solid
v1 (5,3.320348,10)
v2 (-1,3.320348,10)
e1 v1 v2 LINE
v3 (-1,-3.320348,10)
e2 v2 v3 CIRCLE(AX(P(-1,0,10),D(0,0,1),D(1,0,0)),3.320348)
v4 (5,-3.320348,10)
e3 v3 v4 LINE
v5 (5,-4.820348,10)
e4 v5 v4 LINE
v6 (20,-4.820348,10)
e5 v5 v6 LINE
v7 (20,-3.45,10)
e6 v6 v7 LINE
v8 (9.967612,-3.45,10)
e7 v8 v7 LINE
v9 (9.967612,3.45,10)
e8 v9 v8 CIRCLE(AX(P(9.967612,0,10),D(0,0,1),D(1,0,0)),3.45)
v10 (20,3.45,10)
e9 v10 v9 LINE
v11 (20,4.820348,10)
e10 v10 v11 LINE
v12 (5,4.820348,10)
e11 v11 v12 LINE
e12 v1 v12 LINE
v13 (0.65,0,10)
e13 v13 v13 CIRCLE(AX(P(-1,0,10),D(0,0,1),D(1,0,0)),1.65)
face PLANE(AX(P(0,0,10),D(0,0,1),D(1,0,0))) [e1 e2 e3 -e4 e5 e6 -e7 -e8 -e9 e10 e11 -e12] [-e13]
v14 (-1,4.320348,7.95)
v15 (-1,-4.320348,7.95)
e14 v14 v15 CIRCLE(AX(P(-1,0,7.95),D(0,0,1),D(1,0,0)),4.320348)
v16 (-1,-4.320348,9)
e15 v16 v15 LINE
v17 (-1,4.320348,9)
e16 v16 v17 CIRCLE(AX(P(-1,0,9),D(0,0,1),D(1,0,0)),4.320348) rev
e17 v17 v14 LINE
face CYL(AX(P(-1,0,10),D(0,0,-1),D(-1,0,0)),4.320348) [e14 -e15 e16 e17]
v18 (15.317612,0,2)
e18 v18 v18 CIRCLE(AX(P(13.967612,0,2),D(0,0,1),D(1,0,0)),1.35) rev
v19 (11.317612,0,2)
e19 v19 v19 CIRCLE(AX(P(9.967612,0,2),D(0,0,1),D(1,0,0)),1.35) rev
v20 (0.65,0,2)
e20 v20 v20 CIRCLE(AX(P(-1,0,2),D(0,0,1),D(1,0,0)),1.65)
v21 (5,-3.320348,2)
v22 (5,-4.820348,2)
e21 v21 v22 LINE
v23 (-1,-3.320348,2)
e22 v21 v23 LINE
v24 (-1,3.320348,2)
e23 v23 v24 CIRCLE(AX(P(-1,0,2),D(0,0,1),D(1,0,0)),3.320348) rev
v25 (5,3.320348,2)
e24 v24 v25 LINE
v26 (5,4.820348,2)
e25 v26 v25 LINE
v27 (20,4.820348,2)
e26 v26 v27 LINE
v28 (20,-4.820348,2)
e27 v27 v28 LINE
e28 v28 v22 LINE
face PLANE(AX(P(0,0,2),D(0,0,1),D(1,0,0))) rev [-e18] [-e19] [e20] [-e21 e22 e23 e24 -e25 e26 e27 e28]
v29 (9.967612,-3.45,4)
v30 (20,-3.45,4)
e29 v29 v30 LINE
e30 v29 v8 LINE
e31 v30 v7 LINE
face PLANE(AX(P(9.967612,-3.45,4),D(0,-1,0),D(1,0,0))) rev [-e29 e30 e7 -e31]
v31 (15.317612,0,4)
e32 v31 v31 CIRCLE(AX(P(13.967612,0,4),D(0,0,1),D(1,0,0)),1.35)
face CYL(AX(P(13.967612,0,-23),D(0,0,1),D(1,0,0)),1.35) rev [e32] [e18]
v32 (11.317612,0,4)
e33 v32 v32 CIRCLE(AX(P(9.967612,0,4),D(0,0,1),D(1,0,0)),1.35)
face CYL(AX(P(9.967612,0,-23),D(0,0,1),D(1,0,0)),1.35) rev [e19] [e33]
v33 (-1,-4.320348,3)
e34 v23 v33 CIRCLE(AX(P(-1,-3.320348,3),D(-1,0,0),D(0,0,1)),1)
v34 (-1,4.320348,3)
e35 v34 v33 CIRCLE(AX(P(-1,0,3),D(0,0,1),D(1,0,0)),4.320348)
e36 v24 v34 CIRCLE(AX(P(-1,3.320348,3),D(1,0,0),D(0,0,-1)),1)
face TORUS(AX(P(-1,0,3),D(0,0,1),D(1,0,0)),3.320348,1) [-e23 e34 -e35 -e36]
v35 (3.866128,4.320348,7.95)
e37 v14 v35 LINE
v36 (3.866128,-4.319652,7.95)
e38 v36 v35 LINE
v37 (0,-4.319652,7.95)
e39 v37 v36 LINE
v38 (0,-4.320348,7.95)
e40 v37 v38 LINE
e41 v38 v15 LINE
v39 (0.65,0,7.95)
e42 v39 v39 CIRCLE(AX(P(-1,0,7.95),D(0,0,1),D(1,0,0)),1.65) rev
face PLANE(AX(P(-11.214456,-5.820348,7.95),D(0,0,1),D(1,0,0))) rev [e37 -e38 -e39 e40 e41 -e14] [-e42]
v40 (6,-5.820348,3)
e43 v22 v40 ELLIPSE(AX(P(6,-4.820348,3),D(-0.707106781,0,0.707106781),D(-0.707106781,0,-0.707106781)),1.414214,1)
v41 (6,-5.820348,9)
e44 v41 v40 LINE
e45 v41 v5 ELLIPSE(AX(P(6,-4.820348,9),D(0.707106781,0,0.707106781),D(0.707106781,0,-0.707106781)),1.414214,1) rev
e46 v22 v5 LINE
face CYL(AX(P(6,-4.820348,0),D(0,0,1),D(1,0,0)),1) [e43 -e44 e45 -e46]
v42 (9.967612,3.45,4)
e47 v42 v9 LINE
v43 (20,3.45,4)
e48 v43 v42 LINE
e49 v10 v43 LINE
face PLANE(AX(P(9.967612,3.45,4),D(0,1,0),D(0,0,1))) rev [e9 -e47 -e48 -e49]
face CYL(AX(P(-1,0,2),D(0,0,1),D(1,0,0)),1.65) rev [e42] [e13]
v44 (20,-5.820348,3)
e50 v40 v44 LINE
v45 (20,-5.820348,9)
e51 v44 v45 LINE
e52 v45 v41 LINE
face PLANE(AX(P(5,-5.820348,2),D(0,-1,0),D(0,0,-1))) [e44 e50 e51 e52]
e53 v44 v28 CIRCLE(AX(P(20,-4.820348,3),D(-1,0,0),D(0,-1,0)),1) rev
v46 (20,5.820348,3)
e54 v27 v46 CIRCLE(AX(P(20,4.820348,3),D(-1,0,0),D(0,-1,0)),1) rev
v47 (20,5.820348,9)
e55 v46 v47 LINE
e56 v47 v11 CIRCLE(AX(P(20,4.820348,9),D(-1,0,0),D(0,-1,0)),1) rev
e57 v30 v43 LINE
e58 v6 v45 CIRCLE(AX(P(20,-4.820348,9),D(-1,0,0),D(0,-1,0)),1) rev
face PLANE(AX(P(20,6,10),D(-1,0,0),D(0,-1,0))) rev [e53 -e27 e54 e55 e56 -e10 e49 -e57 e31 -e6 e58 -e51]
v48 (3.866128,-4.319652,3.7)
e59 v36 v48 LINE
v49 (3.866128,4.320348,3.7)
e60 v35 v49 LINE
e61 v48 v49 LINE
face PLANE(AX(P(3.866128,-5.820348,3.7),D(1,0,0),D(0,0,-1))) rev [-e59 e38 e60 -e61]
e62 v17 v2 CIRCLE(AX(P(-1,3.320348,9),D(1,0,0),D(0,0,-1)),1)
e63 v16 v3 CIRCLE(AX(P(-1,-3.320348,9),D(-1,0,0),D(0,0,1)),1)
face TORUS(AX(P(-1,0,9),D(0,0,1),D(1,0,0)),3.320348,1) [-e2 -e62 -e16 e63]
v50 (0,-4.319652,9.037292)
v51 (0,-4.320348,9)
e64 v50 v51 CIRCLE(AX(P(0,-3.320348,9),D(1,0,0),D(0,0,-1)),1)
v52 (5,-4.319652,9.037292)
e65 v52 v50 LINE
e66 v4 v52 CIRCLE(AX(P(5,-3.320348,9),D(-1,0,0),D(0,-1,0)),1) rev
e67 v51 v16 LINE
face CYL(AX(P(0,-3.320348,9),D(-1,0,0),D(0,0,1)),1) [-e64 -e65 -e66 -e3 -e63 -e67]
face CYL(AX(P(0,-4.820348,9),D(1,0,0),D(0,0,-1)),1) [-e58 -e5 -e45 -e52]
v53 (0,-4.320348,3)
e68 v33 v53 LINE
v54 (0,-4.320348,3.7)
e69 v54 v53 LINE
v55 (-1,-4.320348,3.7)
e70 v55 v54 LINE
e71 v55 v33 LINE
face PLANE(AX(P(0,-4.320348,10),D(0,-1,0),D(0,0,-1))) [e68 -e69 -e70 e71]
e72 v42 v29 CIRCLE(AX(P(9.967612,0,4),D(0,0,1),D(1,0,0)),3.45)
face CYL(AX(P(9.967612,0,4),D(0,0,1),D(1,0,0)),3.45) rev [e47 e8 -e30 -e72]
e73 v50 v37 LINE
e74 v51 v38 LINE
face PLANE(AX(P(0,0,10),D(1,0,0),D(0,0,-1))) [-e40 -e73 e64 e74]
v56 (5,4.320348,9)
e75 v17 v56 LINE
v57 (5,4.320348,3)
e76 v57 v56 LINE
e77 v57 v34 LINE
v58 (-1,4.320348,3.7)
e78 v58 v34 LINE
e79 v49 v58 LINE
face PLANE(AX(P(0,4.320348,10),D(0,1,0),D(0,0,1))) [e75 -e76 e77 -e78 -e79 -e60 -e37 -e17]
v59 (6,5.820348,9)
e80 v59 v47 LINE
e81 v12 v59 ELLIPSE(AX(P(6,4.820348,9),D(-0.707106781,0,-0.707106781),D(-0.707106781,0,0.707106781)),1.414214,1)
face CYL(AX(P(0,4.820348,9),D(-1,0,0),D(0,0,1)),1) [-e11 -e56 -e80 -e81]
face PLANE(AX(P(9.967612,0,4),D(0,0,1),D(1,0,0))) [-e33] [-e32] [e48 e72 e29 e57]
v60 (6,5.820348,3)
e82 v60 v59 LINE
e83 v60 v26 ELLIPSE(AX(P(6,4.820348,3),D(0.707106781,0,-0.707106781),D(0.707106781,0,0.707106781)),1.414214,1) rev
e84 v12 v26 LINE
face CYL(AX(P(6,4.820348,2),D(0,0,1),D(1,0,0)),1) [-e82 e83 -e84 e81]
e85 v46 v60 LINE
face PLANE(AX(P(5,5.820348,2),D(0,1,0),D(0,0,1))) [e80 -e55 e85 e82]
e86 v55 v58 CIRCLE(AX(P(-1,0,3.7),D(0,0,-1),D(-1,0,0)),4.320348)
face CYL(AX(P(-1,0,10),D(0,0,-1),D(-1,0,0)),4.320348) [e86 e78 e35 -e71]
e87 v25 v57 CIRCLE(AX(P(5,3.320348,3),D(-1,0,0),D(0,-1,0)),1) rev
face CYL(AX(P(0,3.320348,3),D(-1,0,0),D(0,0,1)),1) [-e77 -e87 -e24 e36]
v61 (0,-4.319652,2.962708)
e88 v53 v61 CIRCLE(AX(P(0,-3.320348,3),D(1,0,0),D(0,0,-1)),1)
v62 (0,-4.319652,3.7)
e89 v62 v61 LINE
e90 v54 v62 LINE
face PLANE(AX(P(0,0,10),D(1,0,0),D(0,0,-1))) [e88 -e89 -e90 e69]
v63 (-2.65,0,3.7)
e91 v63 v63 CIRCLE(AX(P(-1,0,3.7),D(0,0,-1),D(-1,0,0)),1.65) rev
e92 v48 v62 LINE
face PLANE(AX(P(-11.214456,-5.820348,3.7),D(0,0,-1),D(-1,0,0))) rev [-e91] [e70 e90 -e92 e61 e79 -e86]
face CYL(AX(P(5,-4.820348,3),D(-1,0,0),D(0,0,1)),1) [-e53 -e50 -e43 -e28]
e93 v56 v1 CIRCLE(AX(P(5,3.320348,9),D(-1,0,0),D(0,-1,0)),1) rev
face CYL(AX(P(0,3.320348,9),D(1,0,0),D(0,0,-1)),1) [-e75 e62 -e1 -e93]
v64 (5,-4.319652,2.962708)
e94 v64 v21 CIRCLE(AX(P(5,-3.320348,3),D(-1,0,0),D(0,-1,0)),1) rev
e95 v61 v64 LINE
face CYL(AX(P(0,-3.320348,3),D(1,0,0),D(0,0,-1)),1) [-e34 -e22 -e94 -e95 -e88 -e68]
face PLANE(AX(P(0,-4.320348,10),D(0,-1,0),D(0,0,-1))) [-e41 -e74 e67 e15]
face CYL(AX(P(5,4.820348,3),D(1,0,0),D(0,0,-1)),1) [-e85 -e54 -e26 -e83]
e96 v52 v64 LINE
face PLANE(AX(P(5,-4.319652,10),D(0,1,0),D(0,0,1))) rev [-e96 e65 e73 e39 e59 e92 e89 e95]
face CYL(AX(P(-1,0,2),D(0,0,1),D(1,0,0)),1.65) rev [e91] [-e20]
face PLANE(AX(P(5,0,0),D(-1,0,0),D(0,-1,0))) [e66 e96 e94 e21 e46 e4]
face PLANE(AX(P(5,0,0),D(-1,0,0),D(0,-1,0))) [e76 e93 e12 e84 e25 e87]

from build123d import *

# Parameters (mm, degrees)
BOSS_EXTRUDE1_OUTLINE_W = 40
BOSS_EXTRUDE1_OUTLINE_H = 12
BOSS_EXTRUDE1_DEPTH     = 10
CUT_EXTRUDE1_DEPTH      = 6
SKETCH3_R               = 1.35
CUT_EXTRUDE2_DEPTH      = 27
SKETCH4_W               = 40.172055773
SKETCH4_H               = 12
CUT_EXTRUDE3_DEPTH      = 2
CUT_EXTRUDE6_DEPTH      = 25
CUT_EXTRUDE9_DEPTH      = 20
SKETCH14_W              = 8
SKETCH14_H              = 1.679652208
CUT_EXTRUDE10_DEPTH     = 24.151673806
BOSS_EXTRUDE4_START     = -4
BOSS_EXTRUDE4_DEPTH     = 8
FILLET7_R               = 0.5
SKETCH18_W              = 15
SKETCH18_H              = 1.5
BOSS_EXTRUDE7_DEPTH     = 8
SKETCH23_W              = 8
SKETCH23_H              = 8.64
BOSS_EXTRUDE9_DEPTH     = 5
SKETCH24_R              = 1.65
CUT_EXTRUDE13_DEPTH     = 23.313145193
SKETCH25_W              = 15.080583778
SKETCH25_H              = 4.25
CUT_EXTRUDE14_DEPTH     = 25.552672093
FILLET13_R              = 1


# Read off the part's stored shape, not the designer's step: Boss-Extrude1, Boss-Extrude4
with BuildPart() as part:
    # Boss-Extrude1 outline → Boss-Extrude1 (new body)
    with BuildSketch(Plane.XY):
        Rectangle(BOSS_EXTRUDE1_OUTLINE_W, BOSS_EXTRUDE1_OUTLINE_H)
    extrude(amount=BOSS_EXTRUDE1_DEPTH)

    # Sketch2 → Cut-Extrude1 (cut)
    with BuildSketch(Plane.XY.offset(10)):
        with BuildLine():
            Line((20.002042678, 3.45), (20, -3.45))
            Line((20, -3.45), (9.967611838, -3.45))
            ThreePointArc((9.967611838, -3.45), (6.517611838, 0), (9.967611838, 3.45))
            Line((9.967611838, 3.45), (20.002042678, 3.45))
        make_face()
    extrude(amount=-CUT_EXTRUDE1_DEPTH, mode=Mode.SUBTRACT)

    # Sketch3 → Cut-Extrude2 (cut)
    with BuildSketch(Plane.XY.offset(4)):
        with Locations((13.967611838, 0)):
            Circle(SKETCH3_R)
        with Locations((9.967611838, 0)):
            Circle(SKETCH3_R)
    extrude(amount=-CUT_EXTRUDE2_DEPTH, mode=Mode.SUBTRACT)

    # Sketch4 → Cut-Extrude3 (cut)
    with BuildSketch(Plane(origin=(0, 0, 0), x_dir=(-1, 0, 0), z_dir=(0, 0, -1))):
        with Locations((0.086027887, 0)):
            Rectangle(SKETCH4_W, SKETCH4_H)
    extrude(amount=-CUT_EXTRUDE3_DEPTH, mode=Mode.SUBTRACT)

    # Sketch7 → Cut-Extrude6 (cut)
    with BuildSketch(Plane.ZY.offset(20)):
        Polygon((2, 6), (2, 2.309401077), (2, -2.309401077), (2, -6), (10, -6), (10, -2.309401077), (10, 2.309401077), (10, 6), align=None)
        Polygon((9.256150484, -1.879939359), (6, -3.759878717), (2.743849516, -1.879939359), (2.743849516, 1.879939359), (6, 3.759878717), (9.256150484, 1.879939359), align=None, mode=Mode.SUBTRACT)
    extrude(amount=-CUT_EXTRUDE6_DEPTH, mode=Mode.SUBTRACT)

    # Sketch11 → Cut-Extrude9 (cut)
    with BuildSketch(Plane.ZY.offset(20)):
        Polygon((10, -2.309401077), (10, 2.309401077), (6, 4.618802154), (2, 2.309401077), (2, -2.309401077), (6, -4.618802154), align=None)
    extrude(amount=-CUT_EXTRUDE9_DEPTH, mode=Mode.SUBTRACT)

    # Sketch14 → Cut-Extrude10 (cut, through all)
    with BuildSketch(Plane.ZY):
        with Locations((6, -5.160173896)):
            Rectangle(SKETCH14_W, SKETCH14_H)
    cut_extrude10 = extrude(amount=-CUT_EXTRUDE10_DEPTH, mode=Mode.SUBTRACT)

    # Mirror4: Cut-Extrude10 across plane
    add(cut_extrude10.mirror(Plane.ZX), mode=Mode.SUBTRACT)

    # Boss-Extrude4 outline → Boss-Extrude4 (add)
    with BuildSketch(Plane.XY.offset(6).offset(BOSS_EXTRUDE4_START)):
        with BuildLine():
            ThreePointArc((-1, 4.320347792), (-5.320347792, 0), (-1, -4.320347792))
            Line((-1, -4.320347792), (0, -4.320347792))
            Line((0, -4.320347792), (0, -4.203023322))
            ThreePointArc((0, -4.203023322), (3.320347792, 0), (0, 4.203023322))
            Line((0, 4.203023322), (0, 4.320347792))
            Line((0, 4.320347792), (-1, 4.320347792))
        make_face()
    extrude(amount=BOSS_EXTRUDE4_DEPTH)

    # Fillet7
    fillet7_edges = [part.edges().sort_by_distance(p)[0] for p in [
        (3.06403913, 3.759878717, 6),
        (3.944944283, 1.879939359, 2.743849516),
        (3.944944283, -1.879939359, 2.743849516),
        (3.06403913, -3.759878717, 6),
        (3.944944283, -1.879939359, 9.256150484),
        (3.944944283, 1.879939359, 9.256150484),
    ]]
    fillet(fillet7_edges, radius=FILLET7_R)

    # Sketch18 → Boss-Extrude7 (add)
    with BuildSketch(Plane.XY.offset(10)):
        with Locations((12.5, 5.070347792)):
            Rectangle(SKETCH18_W, SKETCH18_H)
        with Locations((12.5, -5.070347792)):
            Rectangle(SKETCH18_W, SKETCH18_H)
    extrude(amount=-BOSS_EXTRUDE7_DEPTH)

    # Sketch23 → Boss-Extrude9 (add)
    with BuildSketch(Plane(origin=(0, 0, 0), x_dir=(0, 0, -1), z_dir=(1, 0, 0))):
        with Locations((-6, 0.000347792)):
            Rectangle(SKETCH23_W, SKETCH23_H)
    extrude(amount=BOSS_EXTRUDE9_DEPTH)

    # Sketch24 → Cut-Extrude13 (cut, through all)
    with BuildSketch(Plane.XY.offset(10)):
        with Locations((-1, 0)):
            Circle(SKETCH24_R)
    extrude(amount=-CUT_EXTRUDE13_DEPTH, mode=Mode.SUBTRACT)

    # Sketch25 → Cut-Extrude14 (cut, through all)
    with BuildSketch(Plane(origin=(0, 4.320347792, 0), x_dir=(1, 0, 0), z_dir=(0, 1, 0))):
        with Locations((-3.674163861, -5.825)):
            Rectangle(SKETCH25_W, SKETCH25_H)
    extrude(amount=-CUT_EXTRUDE14_DEPTH, mode=Mode.SUBTRACT)

    # Fillet13
    fillet13_edges = [part.edges().sort_by_distance(p)[0] for p in [
        (-5.320347792, 0, 2),
        (2.5, 4.320347792, 10),
        (-0.5, -4.320347792, 2),
        (2.5, 4.320347792, 2),
        (-5.320347792, 0, 10),
        (-0.5, -4.320347792, 10),
        (12.5, 5.820347792, 2),
        (5, 5.820347792, 6),
        (12.5, 5.820347792, 10),
        (5, -5.820347792, 6),
        (12.5, -5.820347792, 2),
        (12.5, -5.820347792, 10),
        (0, -4.32, 2),
        (0, -4.32, 10),
        (2.5, -4.319652208, 10),
        (2.5, -4.319652208, 2),
    ]]
    fillet(fillet13_edges, radius=FILLET13_R)


solid = part.part
